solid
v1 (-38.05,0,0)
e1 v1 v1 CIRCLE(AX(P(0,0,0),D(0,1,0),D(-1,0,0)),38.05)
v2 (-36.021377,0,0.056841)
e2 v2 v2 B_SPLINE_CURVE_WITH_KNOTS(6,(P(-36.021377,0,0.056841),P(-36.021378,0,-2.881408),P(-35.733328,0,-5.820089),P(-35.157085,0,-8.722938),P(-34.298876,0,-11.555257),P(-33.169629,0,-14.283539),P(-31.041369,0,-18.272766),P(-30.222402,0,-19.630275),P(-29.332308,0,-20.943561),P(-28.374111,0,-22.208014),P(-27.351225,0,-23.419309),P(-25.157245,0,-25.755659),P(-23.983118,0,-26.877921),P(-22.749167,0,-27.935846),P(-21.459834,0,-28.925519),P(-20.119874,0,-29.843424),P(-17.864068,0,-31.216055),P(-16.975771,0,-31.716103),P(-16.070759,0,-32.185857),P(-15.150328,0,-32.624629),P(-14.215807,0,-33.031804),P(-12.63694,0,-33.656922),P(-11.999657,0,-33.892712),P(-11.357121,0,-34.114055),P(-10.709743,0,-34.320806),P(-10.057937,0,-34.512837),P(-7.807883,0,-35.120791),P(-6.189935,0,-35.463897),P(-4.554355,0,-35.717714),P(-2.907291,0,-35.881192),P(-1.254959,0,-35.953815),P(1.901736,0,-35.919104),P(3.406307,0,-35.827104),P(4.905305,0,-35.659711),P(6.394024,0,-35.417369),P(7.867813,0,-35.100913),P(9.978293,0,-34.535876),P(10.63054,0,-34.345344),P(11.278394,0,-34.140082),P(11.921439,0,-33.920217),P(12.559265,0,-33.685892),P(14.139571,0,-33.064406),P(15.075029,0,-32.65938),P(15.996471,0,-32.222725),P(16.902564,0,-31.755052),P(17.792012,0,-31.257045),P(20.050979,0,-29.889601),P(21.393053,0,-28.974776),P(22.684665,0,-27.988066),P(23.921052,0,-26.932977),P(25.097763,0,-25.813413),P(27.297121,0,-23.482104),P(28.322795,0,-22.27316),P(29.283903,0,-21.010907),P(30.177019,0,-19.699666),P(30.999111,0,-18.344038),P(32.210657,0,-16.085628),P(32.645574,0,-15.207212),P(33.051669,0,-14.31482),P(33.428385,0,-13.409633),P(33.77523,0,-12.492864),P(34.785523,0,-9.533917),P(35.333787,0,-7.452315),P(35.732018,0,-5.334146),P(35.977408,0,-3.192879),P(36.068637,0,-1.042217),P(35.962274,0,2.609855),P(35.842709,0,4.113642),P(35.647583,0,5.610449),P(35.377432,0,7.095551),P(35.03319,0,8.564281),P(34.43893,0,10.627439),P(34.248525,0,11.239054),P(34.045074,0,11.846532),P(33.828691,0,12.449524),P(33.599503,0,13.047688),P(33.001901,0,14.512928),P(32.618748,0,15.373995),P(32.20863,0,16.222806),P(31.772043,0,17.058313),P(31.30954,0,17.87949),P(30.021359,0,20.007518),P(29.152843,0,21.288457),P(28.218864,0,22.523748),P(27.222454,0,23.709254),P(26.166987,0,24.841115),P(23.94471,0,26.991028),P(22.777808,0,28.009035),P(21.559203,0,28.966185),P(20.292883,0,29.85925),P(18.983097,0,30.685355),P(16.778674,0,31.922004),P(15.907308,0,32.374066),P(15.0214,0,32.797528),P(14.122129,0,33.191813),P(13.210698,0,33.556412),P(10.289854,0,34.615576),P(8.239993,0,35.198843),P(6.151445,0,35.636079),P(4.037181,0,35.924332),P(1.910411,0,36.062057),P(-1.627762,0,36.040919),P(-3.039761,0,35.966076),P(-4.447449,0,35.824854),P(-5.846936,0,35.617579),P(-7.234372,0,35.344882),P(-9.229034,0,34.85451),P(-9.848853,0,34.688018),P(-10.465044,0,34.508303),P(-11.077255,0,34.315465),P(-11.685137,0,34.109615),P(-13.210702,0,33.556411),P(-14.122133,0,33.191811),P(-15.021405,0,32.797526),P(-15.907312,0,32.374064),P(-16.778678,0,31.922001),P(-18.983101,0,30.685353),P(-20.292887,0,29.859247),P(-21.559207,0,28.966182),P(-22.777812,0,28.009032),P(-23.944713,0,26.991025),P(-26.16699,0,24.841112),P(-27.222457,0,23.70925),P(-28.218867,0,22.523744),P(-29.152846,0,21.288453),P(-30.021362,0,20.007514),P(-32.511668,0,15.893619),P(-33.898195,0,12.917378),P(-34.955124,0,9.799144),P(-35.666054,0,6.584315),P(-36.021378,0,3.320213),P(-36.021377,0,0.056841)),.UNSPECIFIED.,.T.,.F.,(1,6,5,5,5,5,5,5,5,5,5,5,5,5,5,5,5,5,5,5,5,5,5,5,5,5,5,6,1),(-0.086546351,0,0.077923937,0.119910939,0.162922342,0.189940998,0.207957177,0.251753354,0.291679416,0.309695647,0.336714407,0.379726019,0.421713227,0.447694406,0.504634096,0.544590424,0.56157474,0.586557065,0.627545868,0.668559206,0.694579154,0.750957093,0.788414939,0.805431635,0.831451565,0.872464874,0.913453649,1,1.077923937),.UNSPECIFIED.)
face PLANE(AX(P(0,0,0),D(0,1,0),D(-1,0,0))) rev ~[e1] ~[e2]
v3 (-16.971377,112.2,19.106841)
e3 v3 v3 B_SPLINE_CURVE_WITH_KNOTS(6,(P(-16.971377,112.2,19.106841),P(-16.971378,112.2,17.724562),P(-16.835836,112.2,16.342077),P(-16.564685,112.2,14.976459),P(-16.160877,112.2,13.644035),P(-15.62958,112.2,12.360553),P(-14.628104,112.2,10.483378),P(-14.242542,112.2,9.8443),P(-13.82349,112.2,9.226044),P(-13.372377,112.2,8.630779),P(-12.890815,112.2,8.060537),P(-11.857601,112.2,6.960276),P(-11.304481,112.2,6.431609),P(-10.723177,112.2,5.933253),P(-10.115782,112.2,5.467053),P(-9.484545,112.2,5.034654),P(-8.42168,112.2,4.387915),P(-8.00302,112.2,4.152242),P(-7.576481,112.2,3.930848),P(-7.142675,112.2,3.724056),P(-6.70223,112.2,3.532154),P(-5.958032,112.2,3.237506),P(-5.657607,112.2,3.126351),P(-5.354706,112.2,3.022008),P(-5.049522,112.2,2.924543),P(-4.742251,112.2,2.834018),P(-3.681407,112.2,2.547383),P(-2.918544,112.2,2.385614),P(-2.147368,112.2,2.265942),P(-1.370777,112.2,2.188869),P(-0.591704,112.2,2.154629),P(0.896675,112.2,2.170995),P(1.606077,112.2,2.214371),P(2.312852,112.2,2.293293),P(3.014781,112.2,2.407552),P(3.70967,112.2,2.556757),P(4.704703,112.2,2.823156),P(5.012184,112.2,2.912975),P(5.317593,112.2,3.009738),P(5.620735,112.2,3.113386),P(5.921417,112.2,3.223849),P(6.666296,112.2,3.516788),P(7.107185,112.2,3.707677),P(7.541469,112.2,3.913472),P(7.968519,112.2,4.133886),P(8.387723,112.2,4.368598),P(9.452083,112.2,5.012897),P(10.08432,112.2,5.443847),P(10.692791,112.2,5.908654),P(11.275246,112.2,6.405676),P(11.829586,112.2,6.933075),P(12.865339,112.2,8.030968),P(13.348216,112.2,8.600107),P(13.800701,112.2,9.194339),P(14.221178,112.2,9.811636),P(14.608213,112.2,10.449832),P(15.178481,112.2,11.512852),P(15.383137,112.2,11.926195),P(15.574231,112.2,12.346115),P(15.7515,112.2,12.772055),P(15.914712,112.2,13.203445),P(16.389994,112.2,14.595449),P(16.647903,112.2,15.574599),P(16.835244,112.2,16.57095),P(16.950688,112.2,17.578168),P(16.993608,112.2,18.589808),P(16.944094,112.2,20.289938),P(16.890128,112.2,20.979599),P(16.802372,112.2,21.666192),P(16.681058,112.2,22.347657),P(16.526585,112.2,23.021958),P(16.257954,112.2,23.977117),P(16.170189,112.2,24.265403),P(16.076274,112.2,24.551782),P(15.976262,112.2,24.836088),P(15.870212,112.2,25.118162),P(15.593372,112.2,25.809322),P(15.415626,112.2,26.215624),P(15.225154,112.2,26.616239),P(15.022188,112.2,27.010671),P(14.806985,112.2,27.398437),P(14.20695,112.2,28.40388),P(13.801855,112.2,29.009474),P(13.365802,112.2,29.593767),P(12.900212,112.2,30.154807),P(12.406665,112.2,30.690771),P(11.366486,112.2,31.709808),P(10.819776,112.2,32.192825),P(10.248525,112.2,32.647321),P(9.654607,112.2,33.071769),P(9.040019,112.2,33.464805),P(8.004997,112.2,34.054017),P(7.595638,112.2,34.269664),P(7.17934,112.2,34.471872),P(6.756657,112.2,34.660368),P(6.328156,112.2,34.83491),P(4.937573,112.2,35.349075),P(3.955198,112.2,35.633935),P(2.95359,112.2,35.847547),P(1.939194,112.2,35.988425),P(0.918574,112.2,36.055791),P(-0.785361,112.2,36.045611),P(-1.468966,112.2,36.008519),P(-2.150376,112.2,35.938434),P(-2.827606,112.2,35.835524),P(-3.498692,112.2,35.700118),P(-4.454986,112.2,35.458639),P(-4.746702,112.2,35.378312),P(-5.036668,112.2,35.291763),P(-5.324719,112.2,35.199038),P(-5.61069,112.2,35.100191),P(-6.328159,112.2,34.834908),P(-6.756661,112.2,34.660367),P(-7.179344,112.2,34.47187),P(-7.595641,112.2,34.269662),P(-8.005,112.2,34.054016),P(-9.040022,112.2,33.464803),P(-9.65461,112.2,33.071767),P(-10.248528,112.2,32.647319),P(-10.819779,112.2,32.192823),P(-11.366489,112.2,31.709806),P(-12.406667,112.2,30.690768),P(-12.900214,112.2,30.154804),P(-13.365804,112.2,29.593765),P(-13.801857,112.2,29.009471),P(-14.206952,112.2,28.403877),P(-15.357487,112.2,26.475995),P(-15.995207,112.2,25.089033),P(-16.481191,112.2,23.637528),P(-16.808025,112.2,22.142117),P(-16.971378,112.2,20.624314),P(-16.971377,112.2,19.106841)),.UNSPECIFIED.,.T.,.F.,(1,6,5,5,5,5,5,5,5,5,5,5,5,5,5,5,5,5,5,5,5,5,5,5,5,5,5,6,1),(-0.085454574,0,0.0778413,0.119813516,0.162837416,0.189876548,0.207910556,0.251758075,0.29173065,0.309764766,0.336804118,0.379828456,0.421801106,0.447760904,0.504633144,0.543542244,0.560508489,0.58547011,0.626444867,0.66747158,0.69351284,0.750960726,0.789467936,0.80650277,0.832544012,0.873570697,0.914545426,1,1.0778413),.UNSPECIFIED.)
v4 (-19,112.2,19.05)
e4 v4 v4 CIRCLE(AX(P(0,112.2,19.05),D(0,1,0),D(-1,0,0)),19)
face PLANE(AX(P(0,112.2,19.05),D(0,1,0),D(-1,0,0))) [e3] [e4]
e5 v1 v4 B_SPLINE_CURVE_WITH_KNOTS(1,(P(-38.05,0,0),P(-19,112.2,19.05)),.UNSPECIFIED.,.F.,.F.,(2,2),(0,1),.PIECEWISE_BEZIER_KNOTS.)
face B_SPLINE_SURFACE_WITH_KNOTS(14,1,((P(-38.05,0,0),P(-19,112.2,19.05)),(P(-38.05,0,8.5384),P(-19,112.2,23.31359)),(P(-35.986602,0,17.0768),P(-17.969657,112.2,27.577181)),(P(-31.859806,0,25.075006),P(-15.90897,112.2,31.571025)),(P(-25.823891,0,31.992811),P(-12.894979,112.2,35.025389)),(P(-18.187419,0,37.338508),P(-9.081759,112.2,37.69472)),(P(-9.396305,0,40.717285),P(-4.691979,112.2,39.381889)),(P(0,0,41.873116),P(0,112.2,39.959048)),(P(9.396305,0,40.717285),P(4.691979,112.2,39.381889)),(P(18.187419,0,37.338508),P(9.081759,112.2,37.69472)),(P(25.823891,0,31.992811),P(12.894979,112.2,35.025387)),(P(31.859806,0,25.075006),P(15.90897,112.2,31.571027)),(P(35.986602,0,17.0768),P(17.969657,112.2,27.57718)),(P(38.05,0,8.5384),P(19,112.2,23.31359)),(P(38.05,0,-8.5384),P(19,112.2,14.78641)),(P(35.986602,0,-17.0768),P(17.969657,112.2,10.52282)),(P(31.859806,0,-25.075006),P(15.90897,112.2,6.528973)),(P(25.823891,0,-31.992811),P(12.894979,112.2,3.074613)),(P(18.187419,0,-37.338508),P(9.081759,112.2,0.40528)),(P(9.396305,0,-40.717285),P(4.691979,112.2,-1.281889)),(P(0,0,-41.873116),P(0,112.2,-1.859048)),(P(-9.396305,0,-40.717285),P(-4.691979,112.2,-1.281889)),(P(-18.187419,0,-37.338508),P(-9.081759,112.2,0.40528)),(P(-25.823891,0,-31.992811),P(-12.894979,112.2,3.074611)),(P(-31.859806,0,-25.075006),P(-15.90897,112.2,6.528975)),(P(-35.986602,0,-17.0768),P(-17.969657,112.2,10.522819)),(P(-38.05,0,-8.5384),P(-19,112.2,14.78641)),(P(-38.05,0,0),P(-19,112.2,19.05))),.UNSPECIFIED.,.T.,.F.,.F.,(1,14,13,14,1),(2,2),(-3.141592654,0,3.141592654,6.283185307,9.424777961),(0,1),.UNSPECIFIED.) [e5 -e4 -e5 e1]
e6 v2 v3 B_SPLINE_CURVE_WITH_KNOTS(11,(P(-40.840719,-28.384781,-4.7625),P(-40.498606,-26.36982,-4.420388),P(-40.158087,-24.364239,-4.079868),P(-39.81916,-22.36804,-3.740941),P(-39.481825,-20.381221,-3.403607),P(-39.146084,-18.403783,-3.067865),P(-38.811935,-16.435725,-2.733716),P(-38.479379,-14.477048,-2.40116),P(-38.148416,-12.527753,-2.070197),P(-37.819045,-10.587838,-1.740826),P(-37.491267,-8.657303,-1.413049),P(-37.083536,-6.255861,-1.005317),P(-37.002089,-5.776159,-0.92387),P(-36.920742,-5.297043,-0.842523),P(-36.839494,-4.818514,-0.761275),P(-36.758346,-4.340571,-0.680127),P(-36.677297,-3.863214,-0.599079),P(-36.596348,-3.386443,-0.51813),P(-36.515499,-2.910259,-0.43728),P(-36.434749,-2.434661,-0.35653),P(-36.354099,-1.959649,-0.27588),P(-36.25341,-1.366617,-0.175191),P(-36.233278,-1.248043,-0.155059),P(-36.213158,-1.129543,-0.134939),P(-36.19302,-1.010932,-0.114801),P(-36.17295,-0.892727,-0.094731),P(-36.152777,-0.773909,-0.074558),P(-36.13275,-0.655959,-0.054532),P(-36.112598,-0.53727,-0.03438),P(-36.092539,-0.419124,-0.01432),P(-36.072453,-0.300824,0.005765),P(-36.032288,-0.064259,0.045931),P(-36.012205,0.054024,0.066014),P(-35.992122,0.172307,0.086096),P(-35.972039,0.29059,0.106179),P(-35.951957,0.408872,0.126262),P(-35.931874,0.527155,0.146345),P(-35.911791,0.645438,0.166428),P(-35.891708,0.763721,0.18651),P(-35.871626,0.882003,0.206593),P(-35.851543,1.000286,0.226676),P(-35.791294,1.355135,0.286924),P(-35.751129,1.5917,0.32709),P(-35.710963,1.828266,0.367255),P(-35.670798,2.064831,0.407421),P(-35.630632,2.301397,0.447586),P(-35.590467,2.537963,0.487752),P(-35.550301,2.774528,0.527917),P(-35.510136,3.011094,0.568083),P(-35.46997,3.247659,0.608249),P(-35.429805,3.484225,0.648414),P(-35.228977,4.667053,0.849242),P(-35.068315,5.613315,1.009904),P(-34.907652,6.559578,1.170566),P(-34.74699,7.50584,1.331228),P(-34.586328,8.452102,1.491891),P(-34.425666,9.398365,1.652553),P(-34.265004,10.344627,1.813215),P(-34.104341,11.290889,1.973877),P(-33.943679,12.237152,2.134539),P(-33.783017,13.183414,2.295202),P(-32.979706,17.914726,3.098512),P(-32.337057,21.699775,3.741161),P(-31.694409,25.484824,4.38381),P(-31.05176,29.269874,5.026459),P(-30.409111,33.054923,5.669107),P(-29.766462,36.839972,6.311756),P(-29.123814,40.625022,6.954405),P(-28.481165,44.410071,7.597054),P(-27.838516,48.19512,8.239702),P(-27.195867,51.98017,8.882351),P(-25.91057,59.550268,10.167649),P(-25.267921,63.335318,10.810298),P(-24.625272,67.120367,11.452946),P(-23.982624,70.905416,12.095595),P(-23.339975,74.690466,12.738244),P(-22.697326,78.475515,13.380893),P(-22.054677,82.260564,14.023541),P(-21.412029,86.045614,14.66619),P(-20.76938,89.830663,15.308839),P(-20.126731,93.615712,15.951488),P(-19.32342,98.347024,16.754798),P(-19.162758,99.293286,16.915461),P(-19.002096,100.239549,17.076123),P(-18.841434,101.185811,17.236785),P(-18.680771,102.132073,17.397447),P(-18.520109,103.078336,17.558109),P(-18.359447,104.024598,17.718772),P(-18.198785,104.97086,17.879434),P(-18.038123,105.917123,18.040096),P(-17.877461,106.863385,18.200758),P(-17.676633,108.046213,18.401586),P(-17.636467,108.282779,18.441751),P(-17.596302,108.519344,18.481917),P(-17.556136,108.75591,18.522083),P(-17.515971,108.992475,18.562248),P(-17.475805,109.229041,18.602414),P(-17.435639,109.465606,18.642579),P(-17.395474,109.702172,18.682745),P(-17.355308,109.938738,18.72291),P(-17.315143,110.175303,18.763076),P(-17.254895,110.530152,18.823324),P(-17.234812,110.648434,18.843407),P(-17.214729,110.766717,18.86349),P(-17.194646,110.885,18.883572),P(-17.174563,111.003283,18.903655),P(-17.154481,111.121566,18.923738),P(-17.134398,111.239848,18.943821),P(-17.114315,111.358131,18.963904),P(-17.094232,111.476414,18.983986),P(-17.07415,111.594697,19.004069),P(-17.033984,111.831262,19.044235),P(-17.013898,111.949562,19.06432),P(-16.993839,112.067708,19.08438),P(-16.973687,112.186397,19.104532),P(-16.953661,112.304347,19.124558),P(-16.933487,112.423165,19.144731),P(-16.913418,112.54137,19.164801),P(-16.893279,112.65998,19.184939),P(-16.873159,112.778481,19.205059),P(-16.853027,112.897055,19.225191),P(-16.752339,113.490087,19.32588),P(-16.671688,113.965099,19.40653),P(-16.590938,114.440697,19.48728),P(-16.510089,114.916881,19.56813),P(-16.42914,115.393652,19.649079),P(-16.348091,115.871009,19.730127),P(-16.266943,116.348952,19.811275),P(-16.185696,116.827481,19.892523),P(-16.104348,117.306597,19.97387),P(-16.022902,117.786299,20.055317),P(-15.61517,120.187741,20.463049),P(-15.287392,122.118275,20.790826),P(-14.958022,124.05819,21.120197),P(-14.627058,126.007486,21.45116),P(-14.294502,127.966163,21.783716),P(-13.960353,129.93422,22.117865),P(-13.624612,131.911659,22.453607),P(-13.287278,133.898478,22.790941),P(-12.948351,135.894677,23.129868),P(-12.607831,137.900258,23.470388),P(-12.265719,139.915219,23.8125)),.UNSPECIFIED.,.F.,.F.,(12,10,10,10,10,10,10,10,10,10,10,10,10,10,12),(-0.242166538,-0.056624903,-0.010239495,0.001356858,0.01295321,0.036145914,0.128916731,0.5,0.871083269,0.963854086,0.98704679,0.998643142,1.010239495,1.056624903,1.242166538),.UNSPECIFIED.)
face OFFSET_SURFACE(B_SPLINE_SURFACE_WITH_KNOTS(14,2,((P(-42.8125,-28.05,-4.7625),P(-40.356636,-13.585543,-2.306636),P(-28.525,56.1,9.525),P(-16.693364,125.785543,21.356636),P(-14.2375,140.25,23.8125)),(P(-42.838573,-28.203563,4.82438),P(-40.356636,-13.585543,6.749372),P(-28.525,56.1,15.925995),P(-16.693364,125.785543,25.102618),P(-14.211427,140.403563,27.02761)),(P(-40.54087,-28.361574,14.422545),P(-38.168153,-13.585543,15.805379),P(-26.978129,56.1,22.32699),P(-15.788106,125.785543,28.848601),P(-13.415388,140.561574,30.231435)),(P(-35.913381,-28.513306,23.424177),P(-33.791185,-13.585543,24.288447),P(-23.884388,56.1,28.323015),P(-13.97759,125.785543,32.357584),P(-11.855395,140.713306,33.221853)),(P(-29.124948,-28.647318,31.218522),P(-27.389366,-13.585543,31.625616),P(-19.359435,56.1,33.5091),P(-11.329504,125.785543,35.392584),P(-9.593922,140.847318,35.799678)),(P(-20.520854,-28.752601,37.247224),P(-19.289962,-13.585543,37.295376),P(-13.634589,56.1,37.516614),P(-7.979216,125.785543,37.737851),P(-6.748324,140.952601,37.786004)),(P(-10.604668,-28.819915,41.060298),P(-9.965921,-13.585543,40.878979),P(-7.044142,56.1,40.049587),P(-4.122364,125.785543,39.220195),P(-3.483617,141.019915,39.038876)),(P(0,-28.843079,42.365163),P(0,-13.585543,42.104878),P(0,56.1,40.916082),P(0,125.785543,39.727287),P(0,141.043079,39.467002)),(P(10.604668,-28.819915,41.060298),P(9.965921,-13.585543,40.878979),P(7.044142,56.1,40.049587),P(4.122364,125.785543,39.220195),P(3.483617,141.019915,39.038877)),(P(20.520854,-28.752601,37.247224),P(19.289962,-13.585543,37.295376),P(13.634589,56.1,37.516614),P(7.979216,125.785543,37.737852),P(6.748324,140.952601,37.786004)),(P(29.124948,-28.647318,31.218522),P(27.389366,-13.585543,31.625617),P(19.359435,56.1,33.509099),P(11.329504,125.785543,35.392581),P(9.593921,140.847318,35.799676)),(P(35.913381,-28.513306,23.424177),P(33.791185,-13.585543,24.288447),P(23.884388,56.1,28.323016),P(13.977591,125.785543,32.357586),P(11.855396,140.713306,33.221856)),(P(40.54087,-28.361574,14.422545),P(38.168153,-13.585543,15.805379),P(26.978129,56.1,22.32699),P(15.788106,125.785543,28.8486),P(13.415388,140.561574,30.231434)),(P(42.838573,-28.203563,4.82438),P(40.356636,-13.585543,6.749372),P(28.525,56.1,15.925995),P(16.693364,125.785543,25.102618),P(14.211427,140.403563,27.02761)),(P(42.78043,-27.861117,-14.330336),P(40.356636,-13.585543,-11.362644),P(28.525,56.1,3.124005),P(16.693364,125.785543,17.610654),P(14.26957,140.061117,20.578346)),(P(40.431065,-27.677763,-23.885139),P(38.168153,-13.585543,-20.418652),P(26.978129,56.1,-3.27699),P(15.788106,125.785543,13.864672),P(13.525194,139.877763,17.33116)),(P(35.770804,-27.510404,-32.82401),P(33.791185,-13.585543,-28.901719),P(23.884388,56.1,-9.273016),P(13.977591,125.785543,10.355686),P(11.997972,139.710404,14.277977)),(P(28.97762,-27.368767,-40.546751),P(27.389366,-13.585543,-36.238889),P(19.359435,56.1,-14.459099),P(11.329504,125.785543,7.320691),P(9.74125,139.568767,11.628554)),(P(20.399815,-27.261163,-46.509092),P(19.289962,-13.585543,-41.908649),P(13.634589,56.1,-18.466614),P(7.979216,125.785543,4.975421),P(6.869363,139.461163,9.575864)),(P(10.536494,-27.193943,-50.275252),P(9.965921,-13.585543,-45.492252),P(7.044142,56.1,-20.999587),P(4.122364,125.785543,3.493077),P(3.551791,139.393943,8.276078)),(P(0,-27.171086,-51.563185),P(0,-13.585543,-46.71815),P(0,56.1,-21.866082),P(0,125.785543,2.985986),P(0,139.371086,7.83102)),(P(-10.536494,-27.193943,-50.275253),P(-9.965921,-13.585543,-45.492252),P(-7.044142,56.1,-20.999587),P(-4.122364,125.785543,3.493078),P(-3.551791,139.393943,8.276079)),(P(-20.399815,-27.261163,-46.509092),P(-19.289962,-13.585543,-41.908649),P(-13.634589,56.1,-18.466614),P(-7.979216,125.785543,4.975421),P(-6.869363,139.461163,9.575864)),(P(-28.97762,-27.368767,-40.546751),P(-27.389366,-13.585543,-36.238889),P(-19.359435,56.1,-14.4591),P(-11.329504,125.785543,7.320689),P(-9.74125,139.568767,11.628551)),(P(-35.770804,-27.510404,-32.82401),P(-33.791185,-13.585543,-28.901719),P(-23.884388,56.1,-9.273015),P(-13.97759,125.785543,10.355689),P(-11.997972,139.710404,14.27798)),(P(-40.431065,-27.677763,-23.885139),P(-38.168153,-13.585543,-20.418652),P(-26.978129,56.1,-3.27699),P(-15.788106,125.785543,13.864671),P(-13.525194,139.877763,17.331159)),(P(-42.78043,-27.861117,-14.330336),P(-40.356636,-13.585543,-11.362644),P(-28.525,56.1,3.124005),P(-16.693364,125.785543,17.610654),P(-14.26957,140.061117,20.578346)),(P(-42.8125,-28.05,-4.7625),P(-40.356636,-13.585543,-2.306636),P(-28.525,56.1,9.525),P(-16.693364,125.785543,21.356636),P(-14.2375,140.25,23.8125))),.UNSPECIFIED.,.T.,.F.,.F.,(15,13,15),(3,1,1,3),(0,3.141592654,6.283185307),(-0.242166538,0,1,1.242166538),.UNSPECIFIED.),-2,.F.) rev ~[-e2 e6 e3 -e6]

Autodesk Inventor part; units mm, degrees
ref_plane "YZ Plane" through (0, 0, 0) normal (1, 0, 0) x (0, 1, 0)
ref_plane "XY Plane" through (0, 0, 0) normal (0, 0, 1) x (1, 0, 0)
sketch "Szkic6" plane through (0, 0, 0) normal (0, 1, 0) x (-1, 0, 0)
  circle A0 centre (0, 0) radius 38.05
  dimension "d33" = 76.1
ref_plane "Płaszczyzna konstrukcyjna1" through (0, 112.2, 0) normal (0, 1, 0) x (-1, 0, 0)
sketch "Szkic7" plane through (0, 112.2, 0) normal (0, 1, 0) x (-1, 0, 0)
  circle A0 centre (0, 19.05) radius 19
  line L0 (0, -20.3) -> (0, 20.3) construction
  circle A1 centre (0, 0) radius 38.05 construction
  dimension "d35" = 38
loft "Wyciągnięcie złożone1" add profiles "Szkic6", "Szkic7"
shell "Skorupa1" thickness 2 removed faces 2 at (-4.1255, 112.2, 15.7414) at (-5.8996, 0, 7.9079)
equation "\"d33\" = OD1"
equation "\"d35\" = OD2"
equation "\"d52\" = THK"
equation "\"SzerokośćGięciaPodcięcia\" = Grubość"
equation "\"RozmiarPodcięciaNarożnika\" = 4 * Grubość"
equation "\"PromieńPrzejścia\" = PromieńGięcia"
equation "\"Rozmiar_promienia_Jacobiego\" = PromieńGięcia"
equation "\"Wielk_odstępu\" = Grubość"
equation "\"d2\" = PromieńGięcia"
equation "\"d23\" = PromieńGięcia"
equation "\"OD1\" = 76.1"
equation "\"OD2\" = 38"
equation "\"L\" = 112.2"
equation "\"THK\" = 2"
equation "\"d34\" = L"
equation "\"Grubość\" = 1.5"
equation "\"PromieńGięcia\" = 3"
properties part number "Redukcja asymetryczna Ø76,1x38x2 L=112,2" material "304"
